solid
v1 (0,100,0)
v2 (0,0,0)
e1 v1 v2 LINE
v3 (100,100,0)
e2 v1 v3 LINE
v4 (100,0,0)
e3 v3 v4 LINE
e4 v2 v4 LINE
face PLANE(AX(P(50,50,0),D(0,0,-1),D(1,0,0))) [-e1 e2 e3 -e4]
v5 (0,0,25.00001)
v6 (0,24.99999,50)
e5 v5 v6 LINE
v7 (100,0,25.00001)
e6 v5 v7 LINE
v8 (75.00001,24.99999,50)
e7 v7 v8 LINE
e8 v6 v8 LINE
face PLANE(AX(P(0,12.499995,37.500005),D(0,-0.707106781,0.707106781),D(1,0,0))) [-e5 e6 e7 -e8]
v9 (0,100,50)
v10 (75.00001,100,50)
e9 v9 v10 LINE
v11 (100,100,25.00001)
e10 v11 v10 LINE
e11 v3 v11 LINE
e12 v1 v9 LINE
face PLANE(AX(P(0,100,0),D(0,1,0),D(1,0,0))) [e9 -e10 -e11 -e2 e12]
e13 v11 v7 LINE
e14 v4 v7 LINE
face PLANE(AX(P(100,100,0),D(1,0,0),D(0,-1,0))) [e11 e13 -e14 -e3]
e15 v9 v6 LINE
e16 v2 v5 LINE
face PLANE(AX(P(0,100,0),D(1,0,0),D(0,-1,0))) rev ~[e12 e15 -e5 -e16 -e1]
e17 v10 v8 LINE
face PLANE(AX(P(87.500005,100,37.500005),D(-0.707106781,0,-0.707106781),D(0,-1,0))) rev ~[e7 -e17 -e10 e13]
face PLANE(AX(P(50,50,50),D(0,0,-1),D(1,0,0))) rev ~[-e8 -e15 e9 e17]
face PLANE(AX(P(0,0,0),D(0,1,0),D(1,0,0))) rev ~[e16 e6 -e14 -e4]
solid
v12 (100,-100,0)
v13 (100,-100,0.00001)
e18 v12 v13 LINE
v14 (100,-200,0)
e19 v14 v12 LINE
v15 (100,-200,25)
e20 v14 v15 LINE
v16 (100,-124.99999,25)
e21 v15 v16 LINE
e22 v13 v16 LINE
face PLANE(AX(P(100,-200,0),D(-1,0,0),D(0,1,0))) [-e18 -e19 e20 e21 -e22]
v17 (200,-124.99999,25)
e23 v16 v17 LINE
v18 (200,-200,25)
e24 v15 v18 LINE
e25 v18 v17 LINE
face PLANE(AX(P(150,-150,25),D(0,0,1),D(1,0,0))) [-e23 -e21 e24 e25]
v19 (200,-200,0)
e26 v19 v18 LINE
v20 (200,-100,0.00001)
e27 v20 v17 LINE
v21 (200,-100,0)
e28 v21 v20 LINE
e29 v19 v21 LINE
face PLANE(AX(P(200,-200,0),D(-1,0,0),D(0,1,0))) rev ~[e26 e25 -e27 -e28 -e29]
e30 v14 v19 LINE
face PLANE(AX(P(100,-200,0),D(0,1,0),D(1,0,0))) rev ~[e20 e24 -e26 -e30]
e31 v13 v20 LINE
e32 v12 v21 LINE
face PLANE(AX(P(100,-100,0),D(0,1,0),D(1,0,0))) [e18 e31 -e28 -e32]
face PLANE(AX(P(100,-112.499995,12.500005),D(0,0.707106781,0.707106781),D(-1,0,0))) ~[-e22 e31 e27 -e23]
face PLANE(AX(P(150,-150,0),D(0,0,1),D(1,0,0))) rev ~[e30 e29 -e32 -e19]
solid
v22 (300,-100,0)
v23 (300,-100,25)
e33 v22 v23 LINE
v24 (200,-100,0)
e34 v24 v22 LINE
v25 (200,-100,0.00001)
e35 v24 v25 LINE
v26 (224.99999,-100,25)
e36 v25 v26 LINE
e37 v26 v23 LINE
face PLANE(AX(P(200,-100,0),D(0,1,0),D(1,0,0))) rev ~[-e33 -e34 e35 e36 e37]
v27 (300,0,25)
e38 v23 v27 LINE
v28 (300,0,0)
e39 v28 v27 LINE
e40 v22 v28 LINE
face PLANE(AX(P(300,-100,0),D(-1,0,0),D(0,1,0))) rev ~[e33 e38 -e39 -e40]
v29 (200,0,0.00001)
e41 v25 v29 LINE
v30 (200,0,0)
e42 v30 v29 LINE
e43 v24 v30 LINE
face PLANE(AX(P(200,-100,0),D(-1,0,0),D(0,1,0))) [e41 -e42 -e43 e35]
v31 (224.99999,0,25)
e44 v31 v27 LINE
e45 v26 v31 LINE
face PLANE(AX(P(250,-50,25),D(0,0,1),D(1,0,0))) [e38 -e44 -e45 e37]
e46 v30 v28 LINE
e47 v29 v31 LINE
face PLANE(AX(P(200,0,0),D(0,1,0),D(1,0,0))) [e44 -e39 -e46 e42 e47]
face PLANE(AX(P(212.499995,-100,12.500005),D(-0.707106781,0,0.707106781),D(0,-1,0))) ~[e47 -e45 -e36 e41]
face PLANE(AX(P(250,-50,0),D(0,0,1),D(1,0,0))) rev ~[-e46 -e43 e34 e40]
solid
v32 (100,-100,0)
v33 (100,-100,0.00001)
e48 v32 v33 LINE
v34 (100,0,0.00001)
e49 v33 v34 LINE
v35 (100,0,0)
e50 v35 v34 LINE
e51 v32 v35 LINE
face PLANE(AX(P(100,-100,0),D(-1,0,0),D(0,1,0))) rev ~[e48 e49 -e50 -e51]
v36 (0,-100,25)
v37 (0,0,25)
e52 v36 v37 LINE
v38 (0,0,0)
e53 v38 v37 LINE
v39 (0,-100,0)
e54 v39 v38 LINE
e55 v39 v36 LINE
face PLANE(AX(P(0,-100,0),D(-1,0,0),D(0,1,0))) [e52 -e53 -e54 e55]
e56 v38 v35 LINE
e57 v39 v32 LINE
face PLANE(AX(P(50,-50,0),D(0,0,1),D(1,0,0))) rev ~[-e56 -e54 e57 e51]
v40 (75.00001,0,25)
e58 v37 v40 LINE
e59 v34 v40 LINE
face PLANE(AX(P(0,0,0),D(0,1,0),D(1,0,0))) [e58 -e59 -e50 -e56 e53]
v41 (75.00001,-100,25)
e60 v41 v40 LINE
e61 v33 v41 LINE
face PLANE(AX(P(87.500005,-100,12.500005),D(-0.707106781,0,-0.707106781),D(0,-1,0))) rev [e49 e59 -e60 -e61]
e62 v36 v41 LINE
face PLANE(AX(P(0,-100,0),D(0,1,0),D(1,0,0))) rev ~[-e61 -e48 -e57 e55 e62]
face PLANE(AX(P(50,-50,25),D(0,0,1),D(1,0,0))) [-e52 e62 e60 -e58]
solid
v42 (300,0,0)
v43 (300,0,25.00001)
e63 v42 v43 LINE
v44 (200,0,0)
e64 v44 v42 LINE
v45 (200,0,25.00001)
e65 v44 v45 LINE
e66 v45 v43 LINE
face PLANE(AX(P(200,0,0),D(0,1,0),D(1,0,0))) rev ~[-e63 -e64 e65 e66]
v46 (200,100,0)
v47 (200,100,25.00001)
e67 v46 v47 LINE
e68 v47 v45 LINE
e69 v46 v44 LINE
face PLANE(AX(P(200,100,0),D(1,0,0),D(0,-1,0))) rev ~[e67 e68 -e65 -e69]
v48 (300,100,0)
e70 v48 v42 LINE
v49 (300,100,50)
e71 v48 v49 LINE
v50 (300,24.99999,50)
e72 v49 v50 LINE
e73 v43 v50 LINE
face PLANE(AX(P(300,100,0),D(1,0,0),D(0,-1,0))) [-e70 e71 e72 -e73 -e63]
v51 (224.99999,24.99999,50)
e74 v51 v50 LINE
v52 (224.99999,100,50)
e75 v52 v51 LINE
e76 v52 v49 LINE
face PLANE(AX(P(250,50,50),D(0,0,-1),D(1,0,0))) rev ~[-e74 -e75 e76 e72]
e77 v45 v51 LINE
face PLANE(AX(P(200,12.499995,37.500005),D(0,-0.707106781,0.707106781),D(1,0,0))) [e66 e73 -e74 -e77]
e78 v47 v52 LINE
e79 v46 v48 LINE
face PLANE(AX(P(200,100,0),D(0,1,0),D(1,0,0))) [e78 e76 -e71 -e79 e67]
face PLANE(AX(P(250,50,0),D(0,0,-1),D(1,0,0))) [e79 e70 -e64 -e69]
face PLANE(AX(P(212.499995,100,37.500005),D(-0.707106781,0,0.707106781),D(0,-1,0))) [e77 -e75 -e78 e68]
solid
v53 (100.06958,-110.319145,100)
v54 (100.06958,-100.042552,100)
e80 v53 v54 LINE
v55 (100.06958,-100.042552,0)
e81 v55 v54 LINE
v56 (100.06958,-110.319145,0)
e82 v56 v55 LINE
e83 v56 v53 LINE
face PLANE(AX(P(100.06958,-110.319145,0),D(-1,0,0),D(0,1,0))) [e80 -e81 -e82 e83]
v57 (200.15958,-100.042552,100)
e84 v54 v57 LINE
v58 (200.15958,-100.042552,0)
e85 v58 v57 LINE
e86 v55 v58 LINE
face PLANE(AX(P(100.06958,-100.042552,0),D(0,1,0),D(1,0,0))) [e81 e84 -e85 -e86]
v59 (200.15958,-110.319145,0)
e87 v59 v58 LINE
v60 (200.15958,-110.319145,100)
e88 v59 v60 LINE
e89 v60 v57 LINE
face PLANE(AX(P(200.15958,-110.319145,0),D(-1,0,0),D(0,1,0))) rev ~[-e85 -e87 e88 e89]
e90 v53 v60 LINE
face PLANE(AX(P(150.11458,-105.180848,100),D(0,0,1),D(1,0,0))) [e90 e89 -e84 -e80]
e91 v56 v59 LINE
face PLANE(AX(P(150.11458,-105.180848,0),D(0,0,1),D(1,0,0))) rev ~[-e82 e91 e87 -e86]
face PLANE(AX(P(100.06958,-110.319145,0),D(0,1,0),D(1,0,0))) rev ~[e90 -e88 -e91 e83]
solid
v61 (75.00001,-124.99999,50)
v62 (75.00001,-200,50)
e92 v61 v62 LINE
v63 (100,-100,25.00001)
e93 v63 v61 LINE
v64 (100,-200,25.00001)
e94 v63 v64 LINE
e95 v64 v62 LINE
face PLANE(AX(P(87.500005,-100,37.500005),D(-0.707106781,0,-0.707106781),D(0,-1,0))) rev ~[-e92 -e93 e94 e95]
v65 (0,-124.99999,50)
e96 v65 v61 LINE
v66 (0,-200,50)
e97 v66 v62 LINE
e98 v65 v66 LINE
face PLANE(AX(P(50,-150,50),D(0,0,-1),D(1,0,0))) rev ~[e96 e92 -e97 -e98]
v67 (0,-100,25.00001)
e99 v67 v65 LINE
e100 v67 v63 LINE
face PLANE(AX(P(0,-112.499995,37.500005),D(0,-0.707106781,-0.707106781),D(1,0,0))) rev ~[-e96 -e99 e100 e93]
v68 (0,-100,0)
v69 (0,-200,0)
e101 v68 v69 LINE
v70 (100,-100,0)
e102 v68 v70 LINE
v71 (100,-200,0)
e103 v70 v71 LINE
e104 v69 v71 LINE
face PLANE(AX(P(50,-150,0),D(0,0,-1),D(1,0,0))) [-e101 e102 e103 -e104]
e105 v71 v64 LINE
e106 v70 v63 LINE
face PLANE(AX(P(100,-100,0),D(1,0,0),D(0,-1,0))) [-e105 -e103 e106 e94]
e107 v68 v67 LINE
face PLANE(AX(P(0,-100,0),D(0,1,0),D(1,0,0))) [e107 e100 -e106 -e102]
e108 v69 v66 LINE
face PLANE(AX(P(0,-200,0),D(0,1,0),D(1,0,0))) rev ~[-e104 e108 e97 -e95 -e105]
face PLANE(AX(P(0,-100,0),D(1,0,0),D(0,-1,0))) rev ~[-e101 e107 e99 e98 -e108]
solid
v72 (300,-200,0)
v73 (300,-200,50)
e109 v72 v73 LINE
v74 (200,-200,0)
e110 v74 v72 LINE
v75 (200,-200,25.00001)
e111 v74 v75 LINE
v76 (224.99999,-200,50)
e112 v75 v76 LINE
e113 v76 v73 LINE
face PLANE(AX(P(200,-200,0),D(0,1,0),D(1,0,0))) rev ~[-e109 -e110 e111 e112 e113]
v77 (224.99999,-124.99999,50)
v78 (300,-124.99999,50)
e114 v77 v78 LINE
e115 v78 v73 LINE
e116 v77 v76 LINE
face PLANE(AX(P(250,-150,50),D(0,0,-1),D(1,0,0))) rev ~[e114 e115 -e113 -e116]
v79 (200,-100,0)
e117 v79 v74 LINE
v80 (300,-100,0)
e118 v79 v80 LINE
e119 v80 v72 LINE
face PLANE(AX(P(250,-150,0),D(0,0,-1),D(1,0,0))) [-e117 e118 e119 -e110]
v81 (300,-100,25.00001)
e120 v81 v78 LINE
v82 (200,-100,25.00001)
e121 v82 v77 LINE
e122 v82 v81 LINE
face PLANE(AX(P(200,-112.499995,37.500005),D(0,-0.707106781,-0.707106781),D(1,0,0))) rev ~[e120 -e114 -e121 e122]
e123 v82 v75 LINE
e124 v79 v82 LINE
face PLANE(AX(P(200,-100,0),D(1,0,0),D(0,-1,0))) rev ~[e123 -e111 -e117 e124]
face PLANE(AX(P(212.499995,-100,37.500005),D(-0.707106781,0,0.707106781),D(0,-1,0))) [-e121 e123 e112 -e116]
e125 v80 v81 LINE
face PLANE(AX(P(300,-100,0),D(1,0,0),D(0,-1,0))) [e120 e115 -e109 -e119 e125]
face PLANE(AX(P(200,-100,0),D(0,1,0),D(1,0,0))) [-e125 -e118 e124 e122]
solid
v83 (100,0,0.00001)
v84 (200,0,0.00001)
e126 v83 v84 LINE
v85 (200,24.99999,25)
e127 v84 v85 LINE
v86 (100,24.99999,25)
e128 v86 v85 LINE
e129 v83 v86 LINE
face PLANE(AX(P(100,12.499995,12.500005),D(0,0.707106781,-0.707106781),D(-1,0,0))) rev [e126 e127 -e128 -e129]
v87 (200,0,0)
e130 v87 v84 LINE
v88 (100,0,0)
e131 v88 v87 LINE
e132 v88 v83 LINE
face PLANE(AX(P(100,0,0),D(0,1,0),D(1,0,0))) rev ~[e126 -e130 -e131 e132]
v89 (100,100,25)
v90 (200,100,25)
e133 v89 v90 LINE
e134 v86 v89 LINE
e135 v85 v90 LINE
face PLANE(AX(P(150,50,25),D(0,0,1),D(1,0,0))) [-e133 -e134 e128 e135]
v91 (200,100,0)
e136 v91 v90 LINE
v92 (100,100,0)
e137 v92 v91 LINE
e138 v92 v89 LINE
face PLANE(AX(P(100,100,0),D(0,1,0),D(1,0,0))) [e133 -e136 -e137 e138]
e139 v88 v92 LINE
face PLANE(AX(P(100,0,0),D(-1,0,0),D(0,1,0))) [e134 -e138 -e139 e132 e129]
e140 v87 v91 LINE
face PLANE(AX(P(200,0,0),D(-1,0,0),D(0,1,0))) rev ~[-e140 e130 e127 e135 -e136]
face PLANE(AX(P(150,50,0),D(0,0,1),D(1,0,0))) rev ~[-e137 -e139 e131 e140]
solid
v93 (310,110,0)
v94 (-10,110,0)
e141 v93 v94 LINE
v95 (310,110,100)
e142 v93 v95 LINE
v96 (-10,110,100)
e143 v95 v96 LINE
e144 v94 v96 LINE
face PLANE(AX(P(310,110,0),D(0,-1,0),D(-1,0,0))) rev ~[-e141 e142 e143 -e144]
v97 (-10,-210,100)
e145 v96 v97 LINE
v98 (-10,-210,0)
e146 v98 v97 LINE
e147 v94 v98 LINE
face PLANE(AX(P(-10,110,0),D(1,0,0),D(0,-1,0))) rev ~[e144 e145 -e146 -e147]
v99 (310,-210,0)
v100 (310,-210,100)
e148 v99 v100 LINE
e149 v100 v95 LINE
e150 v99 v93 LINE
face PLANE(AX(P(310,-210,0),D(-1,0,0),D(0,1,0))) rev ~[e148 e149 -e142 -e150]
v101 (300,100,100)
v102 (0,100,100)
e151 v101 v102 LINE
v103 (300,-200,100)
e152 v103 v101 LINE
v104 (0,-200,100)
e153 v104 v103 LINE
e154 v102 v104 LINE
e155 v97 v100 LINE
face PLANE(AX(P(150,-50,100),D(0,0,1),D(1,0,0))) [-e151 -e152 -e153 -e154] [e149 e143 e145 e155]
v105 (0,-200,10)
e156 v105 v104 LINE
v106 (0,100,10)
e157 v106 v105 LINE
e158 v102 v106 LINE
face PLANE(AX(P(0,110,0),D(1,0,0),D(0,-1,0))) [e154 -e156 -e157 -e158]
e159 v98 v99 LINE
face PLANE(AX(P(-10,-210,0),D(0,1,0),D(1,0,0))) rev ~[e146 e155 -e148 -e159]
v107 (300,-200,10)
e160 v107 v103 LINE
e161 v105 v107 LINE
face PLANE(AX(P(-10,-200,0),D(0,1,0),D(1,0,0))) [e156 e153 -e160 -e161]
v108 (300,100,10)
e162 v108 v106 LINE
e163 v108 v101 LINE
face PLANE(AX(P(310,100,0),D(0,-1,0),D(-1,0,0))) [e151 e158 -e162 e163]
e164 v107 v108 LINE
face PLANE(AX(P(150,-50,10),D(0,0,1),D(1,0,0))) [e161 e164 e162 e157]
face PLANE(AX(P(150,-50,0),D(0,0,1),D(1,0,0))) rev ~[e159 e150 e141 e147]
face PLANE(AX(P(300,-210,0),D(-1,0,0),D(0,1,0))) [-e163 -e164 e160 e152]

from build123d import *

# Parameters (mm, degrees)
F0_W      = 100
F0_H      = 100
F1_DEPTH  = 25
F2_W      = 100
F2_H      = 100
F3_DEPTH  = 50
F4_SIZE   = 24.99999
F4_2_SIZE = 24.99999
F4_3_SIZE = 24.99999
F4_4_SIZE = 24.99999
F4_5_SIZE = 24.99999
F4_6_SIZE = 24.99999
F4_7_SIZE = 24.99999
F4_8_SIZE = 24.99999
F6_DEPTH  = 100
F7_T      = -10
F8_W      = 100.09
F8_H      = 10.2765932679
F9_DEPTH  = 100


# Not quite as in the source:
# - a fillet or chamfer is up to 0.001 mm smaller than in the source, because OpenCascade refuses the exact size


with BuildPart() as f1:
    # F0 (on Top) → F1 (new body)
    with BuildSketch(Plane.XY):
        with Locations((150, 50)):
            Rectangle(F0_W, F0_H)
    extrude(amount=F1_DEPTH)

    # F4#7 (size 25 in the source; OpenCascade refuses exactly that, so slightly less here)
    f4_7_edges = [f1.edges().sort_by_distance(p)[0] for p in [
        (150, 0, 25),
    ]]
    chamfer(f4_7_edges, length=F4_7_SIZE)


with BuildPart() as f1b:
    # F0 (on Top) → F1, piece 2 (new body)
    with BuildSketch(Plane.XY):
        with Locations((50, -50)):
            Rectangle(F0_W, F0_H)
    extrude(amount=F1_DEPTH)

    # F4#6 (size 25 in the source; OpenCascade refuses exactly that, so slightly less here)
    f4_6_edges = [f1b.edges().sort_by_distance(p)[0] for p in [
        (100, -50, 25),
    ]]
    chamfer(f4_6_edges, length=F4_6_SIZE)


with BuildPart() as f1c:
    # F0 (on Top) → F1, piece 3 (new body)
    with BuildSketch(Plane.XY):
        with Locations((150, -150)):
            Rectangle(F0_W, F0_H)
    extrude(amount=F1_DEPTH)

    # F4#5 (size 25 in the source; OpenCascade refuses exactly that, so slightly less here)
    f4_5_edges = [f1c.edges().sort_by_distance(p)[0] for p in [
        (150, -100, 25),
    ]]
    chamfer(f4_5_edges, length=F4_5_SIZE)


with BuildPart() as f1d:
    # F0 (on Top) → F1, piece 4 (new body)
    with BuildSketch(Plane.XY):
        with Locations((250, -50)):
            Rectangle(F0_W, F0_H)
    extrude(amount=F1_DEPTH)

    # F4#8 (size 25 in the source; OpenCascade refuses exactly that, so slightly less here)
    f4_8_edges = [f1d.edges().sort_by_distance(p)[0] for p in [
        (200, -50, 25),
    ]]
    chamfer(f4_8_edges, length=F4_8_SIZE)


with BuildPart() as f3:
    # F2 (on face) → F3 (new body)
    with BuildSketch(Plane(origin=(0, 0, 0), x_dir=(1, 0, 0), z_dir=(0, 0, -1))):
        with Locations((50, -50)):
            Rectangle(F2_W, F2_H)
    extrude(amount=-F3_DEPTH)

    # F4#2 (size 25 in the source; OpenCascade refuses exactly that, so slightly less here)
    f4_2_edges = [f3.edges().sort_by_distance(p)[0] for p in [
        (50, 0, 50),
        (100, 50, 50),
    ]]
    chamfer(f4_2_edges, length=F4_2_SIZE)


with BuildPart() as f3b:
    # F2 (on face) → F3, piece 2 (new body)
    with BuildSketch(Plane(origin=(0, 0, 0), x_dir=(1, 0, 0), z_dir=(0, 0, -1))):
        with Locations((50, 150)):
            Rectangle(F2_W, F2_H)
    extrude(amount=-F3_DEPTH)

    # F4 (size 25 in the source; OpenCascade refuses exactly that, so slightly less here)
    f4_edges = [f3b.edges().sort_by_distance(p)[0] for p in [
        (100, -150, 50),
        (50, -100, 50),
    ]]
    chamfer(f4_edges, length=F4_SIZE)


with BuildPart() as f3c:
    # F2 (on face) → F3, piece 3 (new body)
    with BuildSketch(Plane(origin=(0, 0, 0), x_dir=(1, 0, 0), z_dir=(0, 0, -1))):
        with Locations((250, 150)):
            Rectangle(F2_W, F2_H)
    extrude(amount=-F3_DEPTH)

    # F4#4 (size 25 in the source; OpenCascade refuses exactly that, so slightly less here)
    f4_4_edges = [f3c.edges().sort_by_distance(p)[0] for p in [
        (250, -100, 50),
        (200, -150, 50),
    ]]
    chamfer(f4_4_edges, length=F4_4_SIZE)


with BuildPart() as f3d:
    # F2 (on face) → F3, piece 4 (new body)
    with BuildSketch(Plane(origin=(0, 0, 0), x_dir=(1, 0, 0), z_dir=(0, 0, -1))):
        with Locations((250, -50)):
            Rectangle(F2_W, F2_H)
    extrude(amount=-F3_DEPTH)

    # F4#3 (size 25 in the source; OpenCascade refuses exactly that, so slightly less here)
    f4_3_edges = [f3d.edges().sort_by_distance(p)[0] for p in [
        (200, 50, 50),
        (250, 0, 50),
    ]]
    chamfer(f4_3_edges, length=F4_3_SIZE)


with BuildPart() as f6:
    # F5 (on Top) → F6 (new body)
    with BuildSketch(Plane.XY):
        Polygon((-10, 110), (-10, 0), (-10, -210), (310, -210), (310, 110), align=None)
    extrude(amount=F6_DEPTH)

    # F7
    f7_openings = [f6.faces().sort_by_distance(p)[0] for p in [
        (150, -50, 100),
    ]]
    offset(amount=F7_T, openings=f7_openings)


with BuildPart() as f9:
    # F8 (on Top) → F9 (new body)
    with BuildSketch(Plane.XY):
        with Locations((150.1145795155, -105.1808483899)):
            Rectangle(F8_W, F8_H)
    extrude(amount=F9_DEPTH)


solid = Compound([f1.part, f1b.part, f1c.part, f1d.part, f3.part, f3b.part, f3c.part, f3d.part, f6.part, f9.part])
